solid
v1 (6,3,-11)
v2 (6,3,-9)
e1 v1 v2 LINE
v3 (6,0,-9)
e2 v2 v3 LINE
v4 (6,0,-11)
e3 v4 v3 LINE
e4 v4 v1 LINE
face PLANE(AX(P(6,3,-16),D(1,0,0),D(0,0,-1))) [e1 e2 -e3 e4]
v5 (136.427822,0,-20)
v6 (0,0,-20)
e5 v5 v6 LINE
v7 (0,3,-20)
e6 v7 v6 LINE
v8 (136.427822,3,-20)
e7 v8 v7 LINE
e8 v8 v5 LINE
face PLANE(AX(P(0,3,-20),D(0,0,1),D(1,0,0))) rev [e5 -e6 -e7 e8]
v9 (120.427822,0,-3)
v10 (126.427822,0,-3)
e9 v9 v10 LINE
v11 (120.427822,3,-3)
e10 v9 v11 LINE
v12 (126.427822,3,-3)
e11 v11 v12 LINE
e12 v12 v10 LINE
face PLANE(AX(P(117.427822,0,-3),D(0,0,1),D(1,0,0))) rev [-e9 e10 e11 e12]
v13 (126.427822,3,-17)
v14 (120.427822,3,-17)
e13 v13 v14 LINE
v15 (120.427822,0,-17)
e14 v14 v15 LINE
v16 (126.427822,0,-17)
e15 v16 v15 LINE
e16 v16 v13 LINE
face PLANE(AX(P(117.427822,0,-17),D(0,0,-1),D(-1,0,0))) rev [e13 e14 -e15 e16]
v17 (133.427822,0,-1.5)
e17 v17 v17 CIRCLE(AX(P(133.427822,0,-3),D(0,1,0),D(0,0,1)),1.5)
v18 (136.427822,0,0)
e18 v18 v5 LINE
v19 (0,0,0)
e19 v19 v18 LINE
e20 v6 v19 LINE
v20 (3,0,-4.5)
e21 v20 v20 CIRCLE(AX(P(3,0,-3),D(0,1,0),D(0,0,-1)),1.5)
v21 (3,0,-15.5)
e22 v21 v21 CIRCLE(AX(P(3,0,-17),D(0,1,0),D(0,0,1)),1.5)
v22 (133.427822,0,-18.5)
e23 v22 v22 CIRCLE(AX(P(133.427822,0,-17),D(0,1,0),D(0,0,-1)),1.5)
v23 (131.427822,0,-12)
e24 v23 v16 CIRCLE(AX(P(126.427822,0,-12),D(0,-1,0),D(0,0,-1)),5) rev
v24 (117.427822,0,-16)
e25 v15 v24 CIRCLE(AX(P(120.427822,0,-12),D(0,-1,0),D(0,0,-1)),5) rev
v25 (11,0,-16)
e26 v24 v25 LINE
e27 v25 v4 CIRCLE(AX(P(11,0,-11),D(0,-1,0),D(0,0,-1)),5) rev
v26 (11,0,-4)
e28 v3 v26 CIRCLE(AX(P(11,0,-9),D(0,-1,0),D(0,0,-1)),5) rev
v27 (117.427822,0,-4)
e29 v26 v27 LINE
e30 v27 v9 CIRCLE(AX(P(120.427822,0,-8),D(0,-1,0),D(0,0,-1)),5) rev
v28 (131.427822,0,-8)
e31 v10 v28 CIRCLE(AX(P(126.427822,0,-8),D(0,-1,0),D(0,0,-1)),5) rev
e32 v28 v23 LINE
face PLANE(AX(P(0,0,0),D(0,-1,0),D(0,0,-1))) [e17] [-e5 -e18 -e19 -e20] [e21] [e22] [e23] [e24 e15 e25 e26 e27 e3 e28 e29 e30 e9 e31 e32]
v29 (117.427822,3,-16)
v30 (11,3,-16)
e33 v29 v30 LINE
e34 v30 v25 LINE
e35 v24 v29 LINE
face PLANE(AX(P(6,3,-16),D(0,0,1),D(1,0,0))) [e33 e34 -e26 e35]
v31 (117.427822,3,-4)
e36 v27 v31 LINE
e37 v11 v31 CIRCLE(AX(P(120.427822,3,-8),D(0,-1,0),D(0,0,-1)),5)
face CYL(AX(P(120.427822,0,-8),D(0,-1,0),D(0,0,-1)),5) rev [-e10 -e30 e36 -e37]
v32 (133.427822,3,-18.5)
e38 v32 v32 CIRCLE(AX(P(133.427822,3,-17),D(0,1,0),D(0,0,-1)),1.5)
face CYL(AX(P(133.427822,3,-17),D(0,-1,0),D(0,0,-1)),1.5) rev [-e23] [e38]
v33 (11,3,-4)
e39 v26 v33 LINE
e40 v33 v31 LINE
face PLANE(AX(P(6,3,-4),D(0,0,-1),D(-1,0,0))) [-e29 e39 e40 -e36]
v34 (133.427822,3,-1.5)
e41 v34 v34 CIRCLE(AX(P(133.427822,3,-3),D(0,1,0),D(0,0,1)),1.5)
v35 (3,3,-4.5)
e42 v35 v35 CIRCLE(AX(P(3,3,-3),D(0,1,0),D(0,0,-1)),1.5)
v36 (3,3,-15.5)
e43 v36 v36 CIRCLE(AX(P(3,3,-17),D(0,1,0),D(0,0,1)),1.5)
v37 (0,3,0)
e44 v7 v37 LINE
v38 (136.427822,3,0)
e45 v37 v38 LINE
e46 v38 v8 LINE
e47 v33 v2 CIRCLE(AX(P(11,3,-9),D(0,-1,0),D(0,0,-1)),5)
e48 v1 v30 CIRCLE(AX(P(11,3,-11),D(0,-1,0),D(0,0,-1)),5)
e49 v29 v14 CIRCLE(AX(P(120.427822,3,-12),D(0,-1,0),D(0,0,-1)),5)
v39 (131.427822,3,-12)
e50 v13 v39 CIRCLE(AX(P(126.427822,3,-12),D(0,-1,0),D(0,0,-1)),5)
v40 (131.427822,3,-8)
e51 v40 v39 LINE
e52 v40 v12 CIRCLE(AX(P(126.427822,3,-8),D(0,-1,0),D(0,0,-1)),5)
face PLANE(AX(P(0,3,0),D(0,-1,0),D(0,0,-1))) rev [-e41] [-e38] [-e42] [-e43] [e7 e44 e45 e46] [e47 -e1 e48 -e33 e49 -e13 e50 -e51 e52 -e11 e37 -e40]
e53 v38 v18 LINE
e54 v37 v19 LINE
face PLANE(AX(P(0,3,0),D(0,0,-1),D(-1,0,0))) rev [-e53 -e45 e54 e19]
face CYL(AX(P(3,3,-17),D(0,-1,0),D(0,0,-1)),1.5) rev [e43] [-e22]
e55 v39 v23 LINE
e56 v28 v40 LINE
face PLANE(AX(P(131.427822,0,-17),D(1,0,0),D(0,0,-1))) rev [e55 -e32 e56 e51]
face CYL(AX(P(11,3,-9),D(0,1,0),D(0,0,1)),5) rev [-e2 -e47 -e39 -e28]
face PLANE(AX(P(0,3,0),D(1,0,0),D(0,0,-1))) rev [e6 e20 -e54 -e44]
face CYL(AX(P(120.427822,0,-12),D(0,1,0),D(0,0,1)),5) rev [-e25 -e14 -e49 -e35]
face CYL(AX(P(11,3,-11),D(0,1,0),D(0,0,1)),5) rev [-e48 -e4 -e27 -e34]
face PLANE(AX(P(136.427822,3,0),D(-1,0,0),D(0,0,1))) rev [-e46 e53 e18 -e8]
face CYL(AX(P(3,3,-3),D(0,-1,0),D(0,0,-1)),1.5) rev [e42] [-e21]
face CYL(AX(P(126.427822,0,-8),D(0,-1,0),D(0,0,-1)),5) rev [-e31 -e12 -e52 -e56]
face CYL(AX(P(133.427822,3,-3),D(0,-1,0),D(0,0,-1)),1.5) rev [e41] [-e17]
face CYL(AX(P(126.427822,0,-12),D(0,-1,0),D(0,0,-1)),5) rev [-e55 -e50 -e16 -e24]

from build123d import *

# Parameters (mm, degrees)
SKETCH1_W           = 136.427821805
SKETCH1_H           = 20
SKETCH1_R           = 1.5
SKETCH1_W_2         = 124.427821805
SKETCH1_H_2         = 12
BOSS_EXTRUDE1_DEPTH = 3
CUT_EXTRUDE1_DEPTH  = 138.918637473
FILLET1_R           = 5


with BuildPart() as part:
    # Sketch1 → Boss-Extrude1 (new body)
    with BuildSketch(Plane(origin=(0, 0, 0), x_dir=(1, 0, 0), z_dir=(0, 1, 0))):
        with Locations((68.213910903, 10)):
            Rectangle(SKETCH1_W, SKETCH1_H)
        with Locations(Location((3, 17, 0), (0, 0, 270))):
            Circle(SKETCH1_R, mode=Mode.SUBTRACT)
        with Locations(Location((3, 3, 0), (0, 0, 90))):
            Circle(SKETCH1_R, mode=Mode.SUBTRACT)
        with Locations(Location((133.427821805, 3, 0), (0, 0, 270))):
            Circle(SKETCH1_R, mode=Mode.SUBTRACT)
        with Locations(Location((133.427821805, 17, 0), (0, 0, 90))):
            Circle(SKETCH1_R, mode=Mode.SUBTRACT)
        with Locations((68.213910903, 10)):
            Rectangle(SKETCH1_W_2, SKETCH1_H_2, mode=Mode.SUBTRACT)
    extrude(amount=BOSS_EXTRUDE1_DEPTH)

    # Sketch2 → Cut-Extrude1 (cut, through all)
    with BuildSketch(Plane(origin=(0, 3, 0), x_dir=(1, 0, 0), z_dir=(0, 1, 0))):
        Polygon((117.427821805, 17), (117.427821805, 16), (130.427821805, 16), (130.427821805, 4), (117.427821805, 4), (117.427821805, 3), (131.427821805, 3), (131.427821805, 17), align=None)
    extrude(amount=-CUT_EXTRUDE1_DEPTH, mode=Mode.SUBTRACT)

    # Fillet1
    # the kernel refuses this fillet: 5 mm, written as the material it adds along each edge
    with BuildSketch(Plane(origin=(131.427821805, 3, -17), x_dir=(0, 0, 1), z_dir=(0, -1, 0)), Plane(origin=(131.427821805, 3, -3), x_dir=(-1, 0, 0), z_dir=(0, -1, 0)), Plane(origin=(6, 0, -16), x_dir=(0, 0, 1), z_dir=(0, 1, 0))) as fillet1_piece_1:
        with BuildLine():
            CenterArc((FILLET1_R, FILLET1_R), FILLET1_R, 180, 90)
            Line((0, FILLET1_R), (-FILLET1_R * 0.02, FILLET1_R))
            Line((-FILLET1_R * 0.02, FILLET1_R), (-FILLET1_R * 0.02, -FILLET1_R * 0.02))
            Line((-FILLET1_R * 0.02, -FILLET1_R * 0.02), (FILLET1_R, -FILLET1_R * 0.02))
            Line((FILLET1_R, -FILLET1_R * 0.02), (FILLET1_R, 0))
        make_face()
    extrude(amount=3)
    with BuildSketch(Plane(origin=(117.427821805, 3, -17), x_dir=(1, 0, 0), z_dir=(0, -1, 0))) as fillet1_piece_2:
        with BuildLine():
            CenterArc((3, 5), FILLET1_R, 233.130102354, 36.869897646)
            Line((0, 1), (-0.06, 0.92))
            ThreePointArc((-0.06, 0.92), (-0.1, 0.5), (-0.1, 0))
            Line((-0.1, 0), (0, -0.1))
            Line((0, -0.1), (3, -0.1))
            Line((3, -0.1), (3, 0))
        make_face()
    extrude(amount=3)
    with BuildSketch(Plane(origin=(117.427821805, 3, -3), x_dir=(0, 0, -1), z_dir=(0, -1, 0))) as fillet1_piece_3:
        with BuildLine():
            CenterArc((5, 3), FILLET1_R, 180, 36.869897646)
            Line((0, 3), (-0.1, 3))
            Line((-0.1, 3), (-0.1, 0))
            Line((-0.1, 0), (0, -0.1))
            ThreePointArc((0, -0.1), (0.5, -0.1), (0.92, -0.06))
            Line((0.92, -0.06), (1, 0))
        make_face()
    extrude(amount=3)
    with BuildSketch(Plane(origin=(6, 0, -4), x_dir=(0, 0, -1), z_dir=(0, 1, 0))) as fillet1_piece_4:
        with BuildLine():
            CenterArc((FILLET1_R, -FILLET1_R), FILLET1_R, 90, 90)
            Line((0, -FILLET1_R), (-FILLET1_R * 0.02, -FILLET1_R))
            Line((-FILLET1_R * 0.02, -FILLET1_R), (-FILLET1_R * 0.02, FILLET1_R * 0.02))
            Line((-FILLET1_R * 0.02, FILLET1_R * 0.02), (FILLET1_R, FILLET1_R * 0.02))
            Line((FILLET1_R, FILLET1_R * 0.02), (FILLET1_R, 0))
        make_face()
    extrude(amount=3)


solid = part.part
